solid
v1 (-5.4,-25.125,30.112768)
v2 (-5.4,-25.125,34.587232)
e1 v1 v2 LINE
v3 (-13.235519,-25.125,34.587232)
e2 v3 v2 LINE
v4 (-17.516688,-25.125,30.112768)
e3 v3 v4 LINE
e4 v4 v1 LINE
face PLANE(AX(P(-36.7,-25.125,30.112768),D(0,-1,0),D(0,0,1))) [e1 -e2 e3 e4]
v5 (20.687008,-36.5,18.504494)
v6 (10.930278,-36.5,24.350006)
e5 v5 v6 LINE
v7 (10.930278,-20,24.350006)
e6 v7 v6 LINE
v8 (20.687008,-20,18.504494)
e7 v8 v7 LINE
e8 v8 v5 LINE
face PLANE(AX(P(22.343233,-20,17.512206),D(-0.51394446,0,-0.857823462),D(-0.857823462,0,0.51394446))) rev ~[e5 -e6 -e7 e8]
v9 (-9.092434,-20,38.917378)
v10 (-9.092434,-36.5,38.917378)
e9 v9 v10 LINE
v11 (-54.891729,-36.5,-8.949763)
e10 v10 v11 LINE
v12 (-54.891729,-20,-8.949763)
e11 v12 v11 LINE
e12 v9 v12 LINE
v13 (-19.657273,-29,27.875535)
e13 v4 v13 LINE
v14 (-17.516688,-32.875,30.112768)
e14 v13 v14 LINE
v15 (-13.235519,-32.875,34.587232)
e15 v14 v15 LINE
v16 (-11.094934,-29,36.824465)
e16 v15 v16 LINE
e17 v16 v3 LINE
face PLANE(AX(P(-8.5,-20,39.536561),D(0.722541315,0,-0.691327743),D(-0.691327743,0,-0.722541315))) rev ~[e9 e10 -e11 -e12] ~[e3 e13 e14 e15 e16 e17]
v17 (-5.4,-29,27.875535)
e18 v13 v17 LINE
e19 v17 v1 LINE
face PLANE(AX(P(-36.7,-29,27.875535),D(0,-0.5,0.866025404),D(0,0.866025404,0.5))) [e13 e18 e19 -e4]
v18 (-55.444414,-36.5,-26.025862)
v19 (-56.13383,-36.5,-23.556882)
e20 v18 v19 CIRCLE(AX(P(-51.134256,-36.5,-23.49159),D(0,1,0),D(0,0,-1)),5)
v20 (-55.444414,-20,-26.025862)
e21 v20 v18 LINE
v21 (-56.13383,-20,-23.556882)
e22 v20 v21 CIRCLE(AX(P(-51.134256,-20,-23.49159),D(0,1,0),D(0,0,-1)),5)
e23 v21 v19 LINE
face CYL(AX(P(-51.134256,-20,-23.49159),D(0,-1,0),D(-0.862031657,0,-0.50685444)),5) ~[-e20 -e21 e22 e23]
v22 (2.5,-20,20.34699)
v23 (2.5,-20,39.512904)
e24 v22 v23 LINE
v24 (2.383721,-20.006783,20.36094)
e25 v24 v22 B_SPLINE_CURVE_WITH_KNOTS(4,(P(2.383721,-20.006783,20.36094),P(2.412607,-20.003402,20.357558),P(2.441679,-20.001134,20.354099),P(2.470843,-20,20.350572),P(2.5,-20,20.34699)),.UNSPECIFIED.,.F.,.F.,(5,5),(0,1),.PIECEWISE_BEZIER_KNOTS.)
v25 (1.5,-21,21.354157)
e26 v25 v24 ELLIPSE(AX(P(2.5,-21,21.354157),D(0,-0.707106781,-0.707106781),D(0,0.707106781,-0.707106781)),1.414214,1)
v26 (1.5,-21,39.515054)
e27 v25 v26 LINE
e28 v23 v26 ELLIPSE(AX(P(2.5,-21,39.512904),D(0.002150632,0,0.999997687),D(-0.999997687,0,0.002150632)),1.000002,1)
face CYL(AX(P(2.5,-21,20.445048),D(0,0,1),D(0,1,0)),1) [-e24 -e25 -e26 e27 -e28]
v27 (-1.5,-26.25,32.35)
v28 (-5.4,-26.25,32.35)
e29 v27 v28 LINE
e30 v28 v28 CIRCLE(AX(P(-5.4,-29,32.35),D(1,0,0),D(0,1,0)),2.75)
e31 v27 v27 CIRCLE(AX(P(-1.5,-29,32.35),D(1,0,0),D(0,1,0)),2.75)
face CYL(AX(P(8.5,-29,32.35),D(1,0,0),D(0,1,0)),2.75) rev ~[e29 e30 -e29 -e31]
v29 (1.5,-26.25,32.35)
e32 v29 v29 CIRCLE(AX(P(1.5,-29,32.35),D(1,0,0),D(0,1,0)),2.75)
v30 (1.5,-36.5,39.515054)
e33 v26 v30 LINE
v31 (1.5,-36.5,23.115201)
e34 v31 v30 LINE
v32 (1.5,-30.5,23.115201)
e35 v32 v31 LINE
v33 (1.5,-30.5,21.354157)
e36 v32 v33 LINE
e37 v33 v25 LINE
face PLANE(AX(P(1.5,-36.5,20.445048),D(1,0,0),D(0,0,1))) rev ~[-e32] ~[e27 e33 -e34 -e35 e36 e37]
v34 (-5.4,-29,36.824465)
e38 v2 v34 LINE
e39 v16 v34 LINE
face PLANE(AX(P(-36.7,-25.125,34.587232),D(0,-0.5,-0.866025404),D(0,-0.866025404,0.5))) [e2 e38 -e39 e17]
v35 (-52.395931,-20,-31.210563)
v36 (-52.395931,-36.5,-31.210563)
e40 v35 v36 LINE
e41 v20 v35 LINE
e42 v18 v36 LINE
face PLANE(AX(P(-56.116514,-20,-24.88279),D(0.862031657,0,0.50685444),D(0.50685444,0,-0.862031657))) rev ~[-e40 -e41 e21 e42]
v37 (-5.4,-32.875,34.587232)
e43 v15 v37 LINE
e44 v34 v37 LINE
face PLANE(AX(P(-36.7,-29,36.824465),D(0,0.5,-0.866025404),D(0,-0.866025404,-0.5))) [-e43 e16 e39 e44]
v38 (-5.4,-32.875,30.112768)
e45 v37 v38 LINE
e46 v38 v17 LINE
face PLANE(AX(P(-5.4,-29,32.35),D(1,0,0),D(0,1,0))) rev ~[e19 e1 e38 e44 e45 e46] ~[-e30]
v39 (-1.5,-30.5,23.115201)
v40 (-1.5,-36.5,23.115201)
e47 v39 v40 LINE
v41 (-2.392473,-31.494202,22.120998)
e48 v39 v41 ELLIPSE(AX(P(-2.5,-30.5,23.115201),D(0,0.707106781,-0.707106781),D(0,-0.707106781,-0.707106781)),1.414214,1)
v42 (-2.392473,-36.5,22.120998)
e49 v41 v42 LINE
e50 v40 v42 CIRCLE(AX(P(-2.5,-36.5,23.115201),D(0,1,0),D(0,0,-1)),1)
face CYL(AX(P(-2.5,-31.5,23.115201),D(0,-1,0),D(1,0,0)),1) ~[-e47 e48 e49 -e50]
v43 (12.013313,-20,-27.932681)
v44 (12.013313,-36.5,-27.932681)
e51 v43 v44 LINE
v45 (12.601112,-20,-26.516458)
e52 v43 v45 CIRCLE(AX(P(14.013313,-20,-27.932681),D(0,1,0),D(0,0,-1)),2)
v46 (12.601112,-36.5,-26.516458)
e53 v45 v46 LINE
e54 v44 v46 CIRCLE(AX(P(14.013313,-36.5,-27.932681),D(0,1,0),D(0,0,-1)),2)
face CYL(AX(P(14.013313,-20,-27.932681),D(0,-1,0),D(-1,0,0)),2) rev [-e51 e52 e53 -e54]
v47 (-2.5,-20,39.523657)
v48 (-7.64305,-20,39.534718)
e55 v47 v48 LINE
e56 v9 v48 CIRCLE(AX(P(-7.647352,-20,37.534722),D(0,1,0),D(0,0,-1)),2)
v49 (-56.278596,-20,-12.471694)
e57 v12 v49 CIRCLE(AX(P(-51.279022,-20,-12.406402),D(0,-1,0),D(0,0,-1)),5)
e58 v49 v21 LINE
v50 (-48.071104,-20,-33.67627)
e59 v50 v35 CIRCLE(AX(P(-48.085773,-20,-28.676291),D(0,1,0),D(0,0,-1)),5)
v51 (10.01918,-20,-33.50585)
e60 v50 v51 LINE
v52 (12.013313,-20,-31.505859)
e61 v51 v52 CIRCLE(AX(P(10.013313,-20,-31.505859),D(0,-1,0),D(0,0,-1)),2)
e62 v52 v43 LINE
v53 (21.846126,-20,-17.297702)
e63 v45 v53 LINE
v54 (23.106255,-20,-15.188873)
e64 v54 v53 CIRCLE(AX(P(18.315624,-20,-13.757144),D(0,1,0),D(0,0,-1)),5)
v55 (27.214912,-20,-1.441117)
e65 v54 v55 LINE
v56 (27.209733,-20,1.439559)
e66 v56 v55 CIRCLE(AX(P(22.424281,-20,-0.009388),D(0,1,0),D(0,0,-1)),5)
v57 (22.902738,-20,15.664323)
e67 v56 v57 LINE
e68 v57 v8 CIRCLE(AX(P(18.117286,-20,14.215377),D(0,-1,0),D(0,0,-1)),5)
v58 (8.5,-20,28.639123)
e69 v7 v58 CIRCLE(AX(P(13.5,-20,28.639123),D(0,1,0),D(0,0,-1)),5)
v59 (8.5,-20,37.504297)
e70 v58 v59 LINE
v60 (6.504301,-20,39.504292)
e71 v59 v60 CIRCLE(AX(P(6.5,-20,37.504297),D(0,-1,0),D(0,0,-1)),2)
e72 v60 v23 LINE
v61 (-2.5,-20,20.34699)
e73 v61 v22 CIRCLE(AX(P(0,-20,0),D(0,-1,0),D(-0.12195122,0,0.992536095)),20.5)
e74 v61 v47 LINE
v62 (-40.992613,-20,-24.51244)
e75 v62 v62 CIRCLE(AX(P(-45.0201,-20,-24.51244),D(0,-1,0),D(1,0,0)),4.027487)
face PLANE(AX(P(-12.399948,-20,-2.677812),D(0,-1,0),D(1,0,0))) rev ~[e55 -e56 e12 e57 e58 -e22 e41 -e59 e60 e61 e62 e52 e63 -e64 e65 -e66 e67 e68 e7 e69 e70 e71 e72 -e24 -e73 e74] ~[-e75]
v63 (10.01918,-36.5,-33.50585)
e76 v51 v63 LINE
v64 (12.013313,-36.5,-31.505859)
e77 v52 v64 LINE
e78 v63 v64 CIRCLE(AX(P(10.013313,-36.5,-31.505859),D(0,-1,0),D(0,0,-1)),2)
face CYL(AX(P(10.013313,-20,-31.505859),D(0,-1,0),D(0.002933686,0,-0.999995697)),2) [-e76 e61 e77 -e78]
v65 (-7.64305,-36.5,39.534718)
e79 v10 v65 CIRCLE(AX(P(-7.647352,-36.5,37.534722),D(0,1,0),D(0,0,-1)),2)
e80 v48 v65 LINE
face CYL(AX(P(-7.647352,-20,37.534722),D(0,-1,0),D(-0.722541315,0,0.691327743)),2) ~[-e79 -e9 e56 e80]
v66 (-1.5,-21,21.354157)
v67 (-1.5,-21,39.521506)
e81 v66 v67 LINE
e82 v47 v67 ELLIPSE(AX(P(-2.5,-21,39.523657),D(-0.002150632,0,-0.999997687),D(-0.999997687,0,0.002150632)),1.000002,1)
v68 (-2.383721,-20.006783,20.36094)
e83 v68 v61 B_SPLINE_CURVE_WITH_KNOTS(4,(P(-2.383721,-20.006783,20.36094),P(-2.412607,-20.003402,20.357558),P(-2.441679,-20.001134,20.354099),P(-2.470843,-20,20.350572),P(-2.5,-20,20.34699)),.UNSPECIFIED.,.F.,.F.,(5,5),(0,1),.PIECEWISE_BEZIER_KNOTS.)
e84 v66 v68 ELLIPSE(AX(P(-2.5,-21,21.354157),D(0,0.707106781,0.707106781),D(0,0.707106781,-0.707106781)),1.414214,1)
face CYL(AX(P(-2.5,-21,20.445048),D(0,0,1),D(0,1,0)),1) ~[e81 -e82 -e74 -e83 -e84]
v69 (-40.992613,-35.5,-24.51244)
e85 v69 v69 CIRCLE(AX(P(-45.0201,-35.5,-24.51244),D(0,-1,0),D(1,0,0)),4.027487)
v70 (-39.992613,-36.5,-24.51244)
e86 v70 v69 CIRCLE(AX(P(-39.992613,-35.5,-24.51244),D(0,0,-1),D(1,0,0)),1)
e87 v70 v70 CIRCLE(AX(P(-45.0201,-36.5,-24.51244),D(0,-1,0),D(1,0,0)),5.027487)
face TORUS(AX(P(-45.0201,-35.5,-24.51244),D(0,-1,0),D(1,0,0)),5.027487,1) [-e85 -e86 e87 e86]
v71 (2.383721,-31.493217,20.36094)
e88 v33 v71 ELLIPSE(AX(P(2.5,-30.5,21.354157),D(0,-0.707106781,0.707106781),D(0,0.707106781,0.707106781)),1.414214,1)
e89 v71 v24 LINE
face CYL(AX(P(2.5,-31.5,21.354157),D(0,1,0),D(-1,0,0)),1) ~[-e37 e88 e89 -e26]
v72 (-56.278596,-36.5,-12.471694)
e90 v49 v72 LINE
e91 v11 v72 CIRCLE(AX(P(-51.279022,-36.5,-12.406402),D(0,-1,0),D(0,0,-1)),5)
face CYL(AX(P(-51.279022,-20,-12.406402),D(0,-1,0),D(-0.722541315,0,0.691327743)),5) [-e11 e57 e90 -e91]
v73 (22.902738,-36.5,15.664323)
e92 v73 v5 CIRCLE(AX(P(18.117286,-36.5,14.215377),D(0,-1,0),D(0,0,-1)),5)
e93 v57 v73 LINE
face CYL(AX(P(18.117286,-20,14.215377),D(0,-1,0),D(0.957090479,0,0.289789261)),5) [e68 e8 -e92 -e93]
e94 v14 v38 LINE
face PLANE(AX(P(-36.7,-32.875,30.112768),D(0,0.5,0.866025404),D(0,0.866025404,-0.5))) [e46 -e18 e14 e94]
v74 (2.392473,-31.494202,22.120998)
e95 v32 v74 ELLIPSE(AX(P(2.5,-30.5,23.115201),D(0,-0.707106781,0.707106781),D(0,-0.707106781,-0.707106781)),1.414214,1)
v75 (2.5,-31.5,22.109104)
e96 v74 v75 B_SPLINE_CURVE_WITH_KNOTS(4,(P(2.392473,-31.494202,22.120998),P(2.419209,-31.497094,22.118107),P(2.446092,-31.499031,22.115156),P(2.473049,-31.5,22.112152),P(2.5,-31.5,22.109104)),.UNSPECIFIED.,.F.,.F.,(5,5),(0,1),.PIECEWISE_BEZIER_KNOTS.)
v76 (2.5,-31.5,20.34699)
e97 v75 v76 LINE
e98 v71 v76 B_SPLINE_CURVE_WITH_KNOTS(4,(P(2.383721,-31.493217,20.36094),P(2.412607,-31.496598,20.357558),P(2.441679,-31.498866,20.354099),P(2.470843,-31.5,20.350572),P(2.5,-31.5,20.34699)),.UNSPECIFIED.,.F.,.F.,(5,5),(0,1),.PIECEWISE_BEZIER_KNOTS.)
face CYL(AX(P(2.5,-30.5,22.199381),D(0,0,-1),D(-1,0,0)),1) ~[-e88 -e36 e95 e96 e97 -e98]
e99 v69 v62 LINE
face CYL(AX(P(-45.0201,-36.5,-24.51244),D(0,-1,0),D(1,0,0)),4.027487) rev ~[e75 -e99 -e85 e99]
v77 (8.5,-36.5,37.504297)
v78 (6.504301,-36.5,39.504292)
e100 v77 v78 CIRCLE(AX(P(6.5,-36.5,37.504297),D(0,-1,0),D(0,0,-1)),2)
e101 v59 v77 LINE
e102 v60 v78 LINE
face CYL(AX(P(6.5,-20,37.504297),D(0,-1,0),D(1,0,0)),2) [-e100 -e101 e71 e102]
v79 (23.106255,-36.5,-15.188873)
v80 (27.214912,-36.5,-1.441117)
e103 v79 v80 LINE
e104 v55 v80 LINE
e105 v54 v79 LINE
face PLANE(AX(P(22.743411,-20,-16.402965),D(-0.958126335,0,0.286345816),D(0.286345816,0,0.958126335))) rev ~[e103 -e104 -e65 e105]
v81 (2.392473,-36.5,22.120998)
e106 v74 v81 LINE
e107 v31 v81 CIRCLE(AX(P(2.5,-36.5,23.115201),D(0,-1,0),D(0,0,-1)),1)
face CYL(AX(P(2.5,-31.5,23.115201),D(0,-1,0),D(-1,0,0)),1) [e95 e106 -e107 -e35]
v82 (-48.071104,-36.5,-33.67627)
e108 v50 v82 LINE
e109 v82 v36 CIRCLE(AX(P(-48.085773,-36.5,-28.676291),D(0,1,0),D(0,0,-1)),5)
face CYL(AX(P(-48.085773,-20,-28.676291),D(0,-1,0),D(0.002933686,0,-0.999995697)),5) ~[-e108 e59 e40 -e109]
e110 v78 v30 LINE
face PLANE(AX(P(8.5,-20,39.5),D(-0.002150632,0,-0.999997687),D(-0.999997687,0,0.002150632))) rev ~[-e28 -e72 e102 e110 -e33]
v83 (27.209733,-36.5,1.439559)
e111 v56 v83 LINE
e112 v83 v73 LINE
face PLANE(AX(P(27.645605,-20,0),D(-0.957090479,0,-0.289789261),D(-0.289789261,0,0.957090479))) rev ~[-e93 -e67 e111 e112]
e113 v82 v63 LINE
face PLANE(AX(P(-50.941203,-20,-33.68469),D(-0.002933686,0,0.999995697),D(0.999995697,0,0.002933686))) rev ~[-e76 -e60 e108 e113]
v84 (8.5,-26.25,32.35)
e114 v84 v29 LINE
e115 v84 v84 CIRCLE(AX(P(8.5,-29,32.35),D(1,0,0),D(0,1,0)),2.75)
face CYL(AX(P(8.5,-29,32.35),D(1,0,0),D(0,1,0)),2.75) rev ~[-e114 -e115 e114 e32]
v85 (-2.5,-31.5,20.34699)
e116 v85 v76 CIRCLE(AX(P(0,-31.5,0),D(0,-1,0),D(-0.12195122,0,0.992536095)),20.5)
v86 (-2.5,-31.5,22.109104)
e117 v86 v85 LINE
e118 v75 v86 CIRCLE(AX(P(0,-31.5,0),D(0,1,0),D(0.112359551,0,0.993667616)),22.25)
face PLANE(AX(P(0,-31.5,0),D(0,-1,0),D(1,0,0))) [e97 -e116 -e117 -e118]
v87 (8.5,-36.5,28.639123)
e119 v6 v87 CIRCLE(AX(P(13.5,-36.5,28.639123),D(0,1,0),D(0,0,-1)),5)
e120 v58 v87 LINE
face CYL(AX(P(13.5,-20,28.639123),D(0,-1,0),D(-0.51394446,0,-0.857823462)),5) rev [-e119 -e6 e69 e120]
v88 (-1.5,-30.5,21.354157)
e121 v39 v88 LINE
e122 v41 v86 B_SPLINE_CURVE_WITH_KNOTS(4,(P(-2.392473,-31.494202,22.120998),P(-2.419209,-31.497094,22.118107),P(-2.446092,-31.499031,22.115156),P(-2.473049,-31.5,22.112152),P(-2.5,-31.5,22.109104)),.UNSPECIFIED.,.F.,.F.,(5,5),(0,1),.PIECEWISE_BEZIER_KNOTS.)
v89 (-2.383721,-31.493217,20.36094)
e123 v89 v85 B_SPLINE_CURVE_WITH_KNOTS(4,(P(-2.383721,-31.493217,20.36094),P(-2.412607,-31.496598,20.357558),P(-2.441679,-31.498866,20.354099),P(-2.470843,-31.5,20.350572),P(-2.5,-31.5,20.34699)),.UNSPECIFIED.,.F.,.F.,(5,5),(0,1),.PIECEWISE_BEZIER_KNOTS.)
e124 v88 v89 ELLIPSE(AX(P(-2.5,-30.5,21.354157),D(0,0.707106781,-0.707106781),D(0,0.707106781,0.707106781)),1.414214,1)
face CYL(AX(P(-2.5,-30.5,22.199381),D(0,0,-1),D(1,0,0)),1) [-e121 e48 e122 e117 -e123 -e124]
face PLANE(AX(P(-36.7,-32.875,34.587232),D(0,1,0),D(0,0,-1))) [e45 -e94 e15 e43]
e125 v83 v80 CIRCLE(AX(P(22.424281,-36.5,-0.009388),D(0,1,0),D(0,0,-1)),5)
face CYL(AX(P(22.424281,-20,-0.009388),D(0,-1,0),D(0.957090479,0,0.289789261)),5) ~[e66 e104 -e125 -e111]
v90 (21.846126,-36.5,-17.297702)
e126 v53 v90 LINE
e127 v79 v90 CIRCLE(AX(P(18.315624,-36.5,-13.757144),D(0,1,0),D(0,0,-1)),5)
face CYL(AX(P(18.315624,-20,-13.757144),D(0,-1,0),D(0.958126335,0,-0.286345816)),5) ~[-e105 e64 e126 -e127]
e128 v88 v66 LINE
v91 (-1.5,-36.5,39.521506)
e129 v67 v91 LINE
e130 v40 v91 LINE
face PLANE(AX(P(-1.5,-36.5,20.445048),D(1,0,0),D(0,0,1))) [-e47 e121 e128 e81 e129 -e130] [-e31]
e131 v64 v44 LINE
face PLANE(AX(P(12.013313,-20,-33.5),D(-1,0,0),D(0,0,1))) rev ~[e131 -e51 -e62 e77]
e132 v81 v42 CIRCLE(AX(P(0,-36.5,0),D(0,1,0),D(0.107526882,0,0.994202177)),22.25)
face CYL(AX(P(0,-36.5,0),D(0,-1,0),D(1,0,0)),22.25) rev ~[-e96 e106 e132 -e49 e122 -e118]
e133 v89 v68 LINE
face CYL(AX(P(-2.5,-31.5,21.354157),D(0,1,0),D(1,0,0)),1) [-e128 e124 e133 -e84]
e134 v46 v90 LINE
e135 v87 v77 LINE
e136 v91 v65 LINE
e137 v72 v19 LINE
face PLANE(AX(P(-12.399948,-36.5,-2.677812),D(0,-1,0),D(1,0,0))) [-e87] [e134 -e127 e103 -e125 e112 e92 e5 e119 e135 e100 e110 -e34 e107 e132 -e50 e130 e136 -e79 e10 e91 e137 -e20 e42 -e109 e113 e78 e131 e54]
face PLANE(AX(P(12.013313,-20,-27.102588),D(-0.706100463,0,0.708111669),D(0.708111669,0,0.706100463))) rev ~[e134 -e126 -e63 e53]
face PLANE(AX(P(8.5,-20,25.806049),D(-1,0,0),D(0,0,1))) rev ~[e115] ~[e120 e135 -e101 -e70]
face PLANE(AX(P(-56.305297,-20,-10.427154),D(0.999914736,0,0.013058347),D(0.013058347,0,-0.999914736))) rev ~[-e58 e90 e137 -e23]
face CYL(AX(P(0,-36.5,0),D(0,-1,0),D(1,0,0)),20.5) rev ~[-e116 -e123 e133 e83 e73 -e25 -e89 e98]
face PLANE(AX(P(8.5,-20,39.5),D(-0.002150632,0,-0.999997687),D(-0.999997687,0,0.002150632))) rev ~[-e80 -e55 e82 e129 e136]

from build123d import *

# Parameters (mm, degrees)
F15_DEPTH = 16.5
F16_R     = 20.5
F17_DEPTH = 16.5
F18_R     = 4.0274870607
F19_DEPTH = 16.5
F20_W     = 3
F20_H     = 20
F21_DEPTH = 16.5
F22_R     = 2.75
F23_DEPTH = 40
F26_DEPTH = 31.3
F27_R     = 22.25
F28_DEPTH = 5
F29_R     = 1
F30_R     = 5
F31_R     = 5
F32_R     = 5
F33_R     = 5
F34_R     = 5
F35_R     = 2
F36_R     = 2


# Not quite as in the source:
# - a feature of the source that left no trace in its solid (it failed there, or was rolled back) is left out


with BuildPart() as f15:
    # F14 (on offset) → F15 (new body)
    with BuildSketch(Plane.XZ.offset(20)):
        Polygon((8.5, 39.5), (-8.5, 39.5365608335), (-56.3052967191, -10.4271536693), (-56.1165139079, -24.8827897012), (-50.9412027895, -33.6846895516), (12.0133129929, -33.5), (12.0133129929, -27.1025877446), (22.7434113622, -16.4029654115), (27.6456046849, 0), (22.3432332277, 17.5122059882), (8.5, 25.806048885), align=None)
    extrude(amount=F15_DEPTH)

    # F16 (on face) → F17 (cut)
    with BuildSketch(Plane.XZ.offset(36.5)):
        Circle(F16_R)
    extrude(amount=-F17_DEPTH, mode=Mode.SUBTRACT)

    # F18 (on face) → F19 (cut)
    with BuildSketch(Plane.XZ.offset(36.5)):
        with Locations((-45.0200997293, -24.5124399662)):
            Circle(F18_R)
    extrude(amount=-F19_DEPTH, mode=Mode.SUBTRACT)

    # F20 (on face) → F21 (cut)
    with BuildSketch(Plane.XZ.offset(36.5)):
        with Locations((0, 30.4450483003)):
            Rectangle(F20_W, F20_H)
    extrude(amount=-F21_DEPTH, mode=Mode.SUBTRACT)

    # F22 (on face) → F23 (cut)
    with BuildSketch(Plane.YZ.offset(8.5)):
        with Locations((-29, 32.35)):
            Circle(F22_R)
    extrude(amount=-F23_DEPTH, mode=Mode.SUBTRACT)

    # F25 (on offset) → F26 (cut)
    with BuildSketch(Plane.YZ.offset(-36.7)):
        Polygon((-32.875, 34.5872322931), (-32.875, 30.1127677069), (-29, 27.8755354138), (-25.125, 30.1127677069), (-25.125, 34.5872322931), (-29, 36.8244645862), align=None)
    extrude(amount=F26_DEPTH, mode=Mode.SUBTRACT)

    # F27 (on face) → F28 (cut)
    with BuildSketch(Plane.XZ.offset(36.5)):
        Circle(F27_R)
    extrude(amount=-F28_DEPTH, mode=Mode.SUBTRACT)

    # F29
    f29_edges = [f15.edges().sort_by_distance(p)[0] for p in [
        (-49.047587, -36.5, -24.51244),
        (-1.5, -20, 29.983277),
        (1.5, -20, 29.980051),
        (-1.5, -34, 22.199381),
        (-1.5, -31.5, 21.322214),
        (-1.5, -25.75, 20.445048),
        (1.5, -25.75, 20.445048),
        (1.5, -31.5, 21.322214),
        (1.5, -34, 22.199381),
    ]]
    fillet(f29_edges, radius=F29_R)

    # F30
    f30_edges = [f15.edges().sort_by_distance(p)[0] for p in [
        (27.645605, -28.25, 0),
    ]]
    fillet(f30_edges, radius=F30_R)

    # F31
    f31_edges = [f15.edges().sort_by_distance(p)[0] for p in [
        (22.343233, -28.25, 17.512206),
    ]]
    fillet(f31_edges, radius=F31_R)

    # F32
    f32_edges = [f15.edges().sort_by_distance(p)[0] for p in [
        (22.743411, -28.25, -16.402965),
    ]]
    fillet(f32_edges, radius=F32_R)

    # F33
    f33_edges = [f15.edges().sort_by_distance(p)[0] for p in [
        (8.5, -28.25, 25.806049),
    ]]
    fillet(f33_edges, radius=F33_R)

    # F34
    f34_edges = [f15.edges().sort_by_distance(p)[0] for p in [
        (-50.941203, -28.25, -33.68469),
        (-56.116514, -28.25, -24.88279),
        (-56.305297, -28.25, -10.427154),
    ]]
    fillet(f34_edges, radius=F34_R)

    # F35
    f35_edges = [f15.edges().sort_by_distance(p)[0] for p in [
        (12.013313, -28.25, -33.5),
        (12.013313, -28.25, -27.102588),
    ]]
    fillet(f35_edges, radius=F35_R)

    # F36
    f36_edges = [f15.edges().sort_by_distance(p)[0] for p in [
        (-8.5, -28.25, 39.536561),
        (8.5, -28.25, 39.5),
    ]]
    fillet(f36_edges, radius=F36_R)


solid = f15.part
